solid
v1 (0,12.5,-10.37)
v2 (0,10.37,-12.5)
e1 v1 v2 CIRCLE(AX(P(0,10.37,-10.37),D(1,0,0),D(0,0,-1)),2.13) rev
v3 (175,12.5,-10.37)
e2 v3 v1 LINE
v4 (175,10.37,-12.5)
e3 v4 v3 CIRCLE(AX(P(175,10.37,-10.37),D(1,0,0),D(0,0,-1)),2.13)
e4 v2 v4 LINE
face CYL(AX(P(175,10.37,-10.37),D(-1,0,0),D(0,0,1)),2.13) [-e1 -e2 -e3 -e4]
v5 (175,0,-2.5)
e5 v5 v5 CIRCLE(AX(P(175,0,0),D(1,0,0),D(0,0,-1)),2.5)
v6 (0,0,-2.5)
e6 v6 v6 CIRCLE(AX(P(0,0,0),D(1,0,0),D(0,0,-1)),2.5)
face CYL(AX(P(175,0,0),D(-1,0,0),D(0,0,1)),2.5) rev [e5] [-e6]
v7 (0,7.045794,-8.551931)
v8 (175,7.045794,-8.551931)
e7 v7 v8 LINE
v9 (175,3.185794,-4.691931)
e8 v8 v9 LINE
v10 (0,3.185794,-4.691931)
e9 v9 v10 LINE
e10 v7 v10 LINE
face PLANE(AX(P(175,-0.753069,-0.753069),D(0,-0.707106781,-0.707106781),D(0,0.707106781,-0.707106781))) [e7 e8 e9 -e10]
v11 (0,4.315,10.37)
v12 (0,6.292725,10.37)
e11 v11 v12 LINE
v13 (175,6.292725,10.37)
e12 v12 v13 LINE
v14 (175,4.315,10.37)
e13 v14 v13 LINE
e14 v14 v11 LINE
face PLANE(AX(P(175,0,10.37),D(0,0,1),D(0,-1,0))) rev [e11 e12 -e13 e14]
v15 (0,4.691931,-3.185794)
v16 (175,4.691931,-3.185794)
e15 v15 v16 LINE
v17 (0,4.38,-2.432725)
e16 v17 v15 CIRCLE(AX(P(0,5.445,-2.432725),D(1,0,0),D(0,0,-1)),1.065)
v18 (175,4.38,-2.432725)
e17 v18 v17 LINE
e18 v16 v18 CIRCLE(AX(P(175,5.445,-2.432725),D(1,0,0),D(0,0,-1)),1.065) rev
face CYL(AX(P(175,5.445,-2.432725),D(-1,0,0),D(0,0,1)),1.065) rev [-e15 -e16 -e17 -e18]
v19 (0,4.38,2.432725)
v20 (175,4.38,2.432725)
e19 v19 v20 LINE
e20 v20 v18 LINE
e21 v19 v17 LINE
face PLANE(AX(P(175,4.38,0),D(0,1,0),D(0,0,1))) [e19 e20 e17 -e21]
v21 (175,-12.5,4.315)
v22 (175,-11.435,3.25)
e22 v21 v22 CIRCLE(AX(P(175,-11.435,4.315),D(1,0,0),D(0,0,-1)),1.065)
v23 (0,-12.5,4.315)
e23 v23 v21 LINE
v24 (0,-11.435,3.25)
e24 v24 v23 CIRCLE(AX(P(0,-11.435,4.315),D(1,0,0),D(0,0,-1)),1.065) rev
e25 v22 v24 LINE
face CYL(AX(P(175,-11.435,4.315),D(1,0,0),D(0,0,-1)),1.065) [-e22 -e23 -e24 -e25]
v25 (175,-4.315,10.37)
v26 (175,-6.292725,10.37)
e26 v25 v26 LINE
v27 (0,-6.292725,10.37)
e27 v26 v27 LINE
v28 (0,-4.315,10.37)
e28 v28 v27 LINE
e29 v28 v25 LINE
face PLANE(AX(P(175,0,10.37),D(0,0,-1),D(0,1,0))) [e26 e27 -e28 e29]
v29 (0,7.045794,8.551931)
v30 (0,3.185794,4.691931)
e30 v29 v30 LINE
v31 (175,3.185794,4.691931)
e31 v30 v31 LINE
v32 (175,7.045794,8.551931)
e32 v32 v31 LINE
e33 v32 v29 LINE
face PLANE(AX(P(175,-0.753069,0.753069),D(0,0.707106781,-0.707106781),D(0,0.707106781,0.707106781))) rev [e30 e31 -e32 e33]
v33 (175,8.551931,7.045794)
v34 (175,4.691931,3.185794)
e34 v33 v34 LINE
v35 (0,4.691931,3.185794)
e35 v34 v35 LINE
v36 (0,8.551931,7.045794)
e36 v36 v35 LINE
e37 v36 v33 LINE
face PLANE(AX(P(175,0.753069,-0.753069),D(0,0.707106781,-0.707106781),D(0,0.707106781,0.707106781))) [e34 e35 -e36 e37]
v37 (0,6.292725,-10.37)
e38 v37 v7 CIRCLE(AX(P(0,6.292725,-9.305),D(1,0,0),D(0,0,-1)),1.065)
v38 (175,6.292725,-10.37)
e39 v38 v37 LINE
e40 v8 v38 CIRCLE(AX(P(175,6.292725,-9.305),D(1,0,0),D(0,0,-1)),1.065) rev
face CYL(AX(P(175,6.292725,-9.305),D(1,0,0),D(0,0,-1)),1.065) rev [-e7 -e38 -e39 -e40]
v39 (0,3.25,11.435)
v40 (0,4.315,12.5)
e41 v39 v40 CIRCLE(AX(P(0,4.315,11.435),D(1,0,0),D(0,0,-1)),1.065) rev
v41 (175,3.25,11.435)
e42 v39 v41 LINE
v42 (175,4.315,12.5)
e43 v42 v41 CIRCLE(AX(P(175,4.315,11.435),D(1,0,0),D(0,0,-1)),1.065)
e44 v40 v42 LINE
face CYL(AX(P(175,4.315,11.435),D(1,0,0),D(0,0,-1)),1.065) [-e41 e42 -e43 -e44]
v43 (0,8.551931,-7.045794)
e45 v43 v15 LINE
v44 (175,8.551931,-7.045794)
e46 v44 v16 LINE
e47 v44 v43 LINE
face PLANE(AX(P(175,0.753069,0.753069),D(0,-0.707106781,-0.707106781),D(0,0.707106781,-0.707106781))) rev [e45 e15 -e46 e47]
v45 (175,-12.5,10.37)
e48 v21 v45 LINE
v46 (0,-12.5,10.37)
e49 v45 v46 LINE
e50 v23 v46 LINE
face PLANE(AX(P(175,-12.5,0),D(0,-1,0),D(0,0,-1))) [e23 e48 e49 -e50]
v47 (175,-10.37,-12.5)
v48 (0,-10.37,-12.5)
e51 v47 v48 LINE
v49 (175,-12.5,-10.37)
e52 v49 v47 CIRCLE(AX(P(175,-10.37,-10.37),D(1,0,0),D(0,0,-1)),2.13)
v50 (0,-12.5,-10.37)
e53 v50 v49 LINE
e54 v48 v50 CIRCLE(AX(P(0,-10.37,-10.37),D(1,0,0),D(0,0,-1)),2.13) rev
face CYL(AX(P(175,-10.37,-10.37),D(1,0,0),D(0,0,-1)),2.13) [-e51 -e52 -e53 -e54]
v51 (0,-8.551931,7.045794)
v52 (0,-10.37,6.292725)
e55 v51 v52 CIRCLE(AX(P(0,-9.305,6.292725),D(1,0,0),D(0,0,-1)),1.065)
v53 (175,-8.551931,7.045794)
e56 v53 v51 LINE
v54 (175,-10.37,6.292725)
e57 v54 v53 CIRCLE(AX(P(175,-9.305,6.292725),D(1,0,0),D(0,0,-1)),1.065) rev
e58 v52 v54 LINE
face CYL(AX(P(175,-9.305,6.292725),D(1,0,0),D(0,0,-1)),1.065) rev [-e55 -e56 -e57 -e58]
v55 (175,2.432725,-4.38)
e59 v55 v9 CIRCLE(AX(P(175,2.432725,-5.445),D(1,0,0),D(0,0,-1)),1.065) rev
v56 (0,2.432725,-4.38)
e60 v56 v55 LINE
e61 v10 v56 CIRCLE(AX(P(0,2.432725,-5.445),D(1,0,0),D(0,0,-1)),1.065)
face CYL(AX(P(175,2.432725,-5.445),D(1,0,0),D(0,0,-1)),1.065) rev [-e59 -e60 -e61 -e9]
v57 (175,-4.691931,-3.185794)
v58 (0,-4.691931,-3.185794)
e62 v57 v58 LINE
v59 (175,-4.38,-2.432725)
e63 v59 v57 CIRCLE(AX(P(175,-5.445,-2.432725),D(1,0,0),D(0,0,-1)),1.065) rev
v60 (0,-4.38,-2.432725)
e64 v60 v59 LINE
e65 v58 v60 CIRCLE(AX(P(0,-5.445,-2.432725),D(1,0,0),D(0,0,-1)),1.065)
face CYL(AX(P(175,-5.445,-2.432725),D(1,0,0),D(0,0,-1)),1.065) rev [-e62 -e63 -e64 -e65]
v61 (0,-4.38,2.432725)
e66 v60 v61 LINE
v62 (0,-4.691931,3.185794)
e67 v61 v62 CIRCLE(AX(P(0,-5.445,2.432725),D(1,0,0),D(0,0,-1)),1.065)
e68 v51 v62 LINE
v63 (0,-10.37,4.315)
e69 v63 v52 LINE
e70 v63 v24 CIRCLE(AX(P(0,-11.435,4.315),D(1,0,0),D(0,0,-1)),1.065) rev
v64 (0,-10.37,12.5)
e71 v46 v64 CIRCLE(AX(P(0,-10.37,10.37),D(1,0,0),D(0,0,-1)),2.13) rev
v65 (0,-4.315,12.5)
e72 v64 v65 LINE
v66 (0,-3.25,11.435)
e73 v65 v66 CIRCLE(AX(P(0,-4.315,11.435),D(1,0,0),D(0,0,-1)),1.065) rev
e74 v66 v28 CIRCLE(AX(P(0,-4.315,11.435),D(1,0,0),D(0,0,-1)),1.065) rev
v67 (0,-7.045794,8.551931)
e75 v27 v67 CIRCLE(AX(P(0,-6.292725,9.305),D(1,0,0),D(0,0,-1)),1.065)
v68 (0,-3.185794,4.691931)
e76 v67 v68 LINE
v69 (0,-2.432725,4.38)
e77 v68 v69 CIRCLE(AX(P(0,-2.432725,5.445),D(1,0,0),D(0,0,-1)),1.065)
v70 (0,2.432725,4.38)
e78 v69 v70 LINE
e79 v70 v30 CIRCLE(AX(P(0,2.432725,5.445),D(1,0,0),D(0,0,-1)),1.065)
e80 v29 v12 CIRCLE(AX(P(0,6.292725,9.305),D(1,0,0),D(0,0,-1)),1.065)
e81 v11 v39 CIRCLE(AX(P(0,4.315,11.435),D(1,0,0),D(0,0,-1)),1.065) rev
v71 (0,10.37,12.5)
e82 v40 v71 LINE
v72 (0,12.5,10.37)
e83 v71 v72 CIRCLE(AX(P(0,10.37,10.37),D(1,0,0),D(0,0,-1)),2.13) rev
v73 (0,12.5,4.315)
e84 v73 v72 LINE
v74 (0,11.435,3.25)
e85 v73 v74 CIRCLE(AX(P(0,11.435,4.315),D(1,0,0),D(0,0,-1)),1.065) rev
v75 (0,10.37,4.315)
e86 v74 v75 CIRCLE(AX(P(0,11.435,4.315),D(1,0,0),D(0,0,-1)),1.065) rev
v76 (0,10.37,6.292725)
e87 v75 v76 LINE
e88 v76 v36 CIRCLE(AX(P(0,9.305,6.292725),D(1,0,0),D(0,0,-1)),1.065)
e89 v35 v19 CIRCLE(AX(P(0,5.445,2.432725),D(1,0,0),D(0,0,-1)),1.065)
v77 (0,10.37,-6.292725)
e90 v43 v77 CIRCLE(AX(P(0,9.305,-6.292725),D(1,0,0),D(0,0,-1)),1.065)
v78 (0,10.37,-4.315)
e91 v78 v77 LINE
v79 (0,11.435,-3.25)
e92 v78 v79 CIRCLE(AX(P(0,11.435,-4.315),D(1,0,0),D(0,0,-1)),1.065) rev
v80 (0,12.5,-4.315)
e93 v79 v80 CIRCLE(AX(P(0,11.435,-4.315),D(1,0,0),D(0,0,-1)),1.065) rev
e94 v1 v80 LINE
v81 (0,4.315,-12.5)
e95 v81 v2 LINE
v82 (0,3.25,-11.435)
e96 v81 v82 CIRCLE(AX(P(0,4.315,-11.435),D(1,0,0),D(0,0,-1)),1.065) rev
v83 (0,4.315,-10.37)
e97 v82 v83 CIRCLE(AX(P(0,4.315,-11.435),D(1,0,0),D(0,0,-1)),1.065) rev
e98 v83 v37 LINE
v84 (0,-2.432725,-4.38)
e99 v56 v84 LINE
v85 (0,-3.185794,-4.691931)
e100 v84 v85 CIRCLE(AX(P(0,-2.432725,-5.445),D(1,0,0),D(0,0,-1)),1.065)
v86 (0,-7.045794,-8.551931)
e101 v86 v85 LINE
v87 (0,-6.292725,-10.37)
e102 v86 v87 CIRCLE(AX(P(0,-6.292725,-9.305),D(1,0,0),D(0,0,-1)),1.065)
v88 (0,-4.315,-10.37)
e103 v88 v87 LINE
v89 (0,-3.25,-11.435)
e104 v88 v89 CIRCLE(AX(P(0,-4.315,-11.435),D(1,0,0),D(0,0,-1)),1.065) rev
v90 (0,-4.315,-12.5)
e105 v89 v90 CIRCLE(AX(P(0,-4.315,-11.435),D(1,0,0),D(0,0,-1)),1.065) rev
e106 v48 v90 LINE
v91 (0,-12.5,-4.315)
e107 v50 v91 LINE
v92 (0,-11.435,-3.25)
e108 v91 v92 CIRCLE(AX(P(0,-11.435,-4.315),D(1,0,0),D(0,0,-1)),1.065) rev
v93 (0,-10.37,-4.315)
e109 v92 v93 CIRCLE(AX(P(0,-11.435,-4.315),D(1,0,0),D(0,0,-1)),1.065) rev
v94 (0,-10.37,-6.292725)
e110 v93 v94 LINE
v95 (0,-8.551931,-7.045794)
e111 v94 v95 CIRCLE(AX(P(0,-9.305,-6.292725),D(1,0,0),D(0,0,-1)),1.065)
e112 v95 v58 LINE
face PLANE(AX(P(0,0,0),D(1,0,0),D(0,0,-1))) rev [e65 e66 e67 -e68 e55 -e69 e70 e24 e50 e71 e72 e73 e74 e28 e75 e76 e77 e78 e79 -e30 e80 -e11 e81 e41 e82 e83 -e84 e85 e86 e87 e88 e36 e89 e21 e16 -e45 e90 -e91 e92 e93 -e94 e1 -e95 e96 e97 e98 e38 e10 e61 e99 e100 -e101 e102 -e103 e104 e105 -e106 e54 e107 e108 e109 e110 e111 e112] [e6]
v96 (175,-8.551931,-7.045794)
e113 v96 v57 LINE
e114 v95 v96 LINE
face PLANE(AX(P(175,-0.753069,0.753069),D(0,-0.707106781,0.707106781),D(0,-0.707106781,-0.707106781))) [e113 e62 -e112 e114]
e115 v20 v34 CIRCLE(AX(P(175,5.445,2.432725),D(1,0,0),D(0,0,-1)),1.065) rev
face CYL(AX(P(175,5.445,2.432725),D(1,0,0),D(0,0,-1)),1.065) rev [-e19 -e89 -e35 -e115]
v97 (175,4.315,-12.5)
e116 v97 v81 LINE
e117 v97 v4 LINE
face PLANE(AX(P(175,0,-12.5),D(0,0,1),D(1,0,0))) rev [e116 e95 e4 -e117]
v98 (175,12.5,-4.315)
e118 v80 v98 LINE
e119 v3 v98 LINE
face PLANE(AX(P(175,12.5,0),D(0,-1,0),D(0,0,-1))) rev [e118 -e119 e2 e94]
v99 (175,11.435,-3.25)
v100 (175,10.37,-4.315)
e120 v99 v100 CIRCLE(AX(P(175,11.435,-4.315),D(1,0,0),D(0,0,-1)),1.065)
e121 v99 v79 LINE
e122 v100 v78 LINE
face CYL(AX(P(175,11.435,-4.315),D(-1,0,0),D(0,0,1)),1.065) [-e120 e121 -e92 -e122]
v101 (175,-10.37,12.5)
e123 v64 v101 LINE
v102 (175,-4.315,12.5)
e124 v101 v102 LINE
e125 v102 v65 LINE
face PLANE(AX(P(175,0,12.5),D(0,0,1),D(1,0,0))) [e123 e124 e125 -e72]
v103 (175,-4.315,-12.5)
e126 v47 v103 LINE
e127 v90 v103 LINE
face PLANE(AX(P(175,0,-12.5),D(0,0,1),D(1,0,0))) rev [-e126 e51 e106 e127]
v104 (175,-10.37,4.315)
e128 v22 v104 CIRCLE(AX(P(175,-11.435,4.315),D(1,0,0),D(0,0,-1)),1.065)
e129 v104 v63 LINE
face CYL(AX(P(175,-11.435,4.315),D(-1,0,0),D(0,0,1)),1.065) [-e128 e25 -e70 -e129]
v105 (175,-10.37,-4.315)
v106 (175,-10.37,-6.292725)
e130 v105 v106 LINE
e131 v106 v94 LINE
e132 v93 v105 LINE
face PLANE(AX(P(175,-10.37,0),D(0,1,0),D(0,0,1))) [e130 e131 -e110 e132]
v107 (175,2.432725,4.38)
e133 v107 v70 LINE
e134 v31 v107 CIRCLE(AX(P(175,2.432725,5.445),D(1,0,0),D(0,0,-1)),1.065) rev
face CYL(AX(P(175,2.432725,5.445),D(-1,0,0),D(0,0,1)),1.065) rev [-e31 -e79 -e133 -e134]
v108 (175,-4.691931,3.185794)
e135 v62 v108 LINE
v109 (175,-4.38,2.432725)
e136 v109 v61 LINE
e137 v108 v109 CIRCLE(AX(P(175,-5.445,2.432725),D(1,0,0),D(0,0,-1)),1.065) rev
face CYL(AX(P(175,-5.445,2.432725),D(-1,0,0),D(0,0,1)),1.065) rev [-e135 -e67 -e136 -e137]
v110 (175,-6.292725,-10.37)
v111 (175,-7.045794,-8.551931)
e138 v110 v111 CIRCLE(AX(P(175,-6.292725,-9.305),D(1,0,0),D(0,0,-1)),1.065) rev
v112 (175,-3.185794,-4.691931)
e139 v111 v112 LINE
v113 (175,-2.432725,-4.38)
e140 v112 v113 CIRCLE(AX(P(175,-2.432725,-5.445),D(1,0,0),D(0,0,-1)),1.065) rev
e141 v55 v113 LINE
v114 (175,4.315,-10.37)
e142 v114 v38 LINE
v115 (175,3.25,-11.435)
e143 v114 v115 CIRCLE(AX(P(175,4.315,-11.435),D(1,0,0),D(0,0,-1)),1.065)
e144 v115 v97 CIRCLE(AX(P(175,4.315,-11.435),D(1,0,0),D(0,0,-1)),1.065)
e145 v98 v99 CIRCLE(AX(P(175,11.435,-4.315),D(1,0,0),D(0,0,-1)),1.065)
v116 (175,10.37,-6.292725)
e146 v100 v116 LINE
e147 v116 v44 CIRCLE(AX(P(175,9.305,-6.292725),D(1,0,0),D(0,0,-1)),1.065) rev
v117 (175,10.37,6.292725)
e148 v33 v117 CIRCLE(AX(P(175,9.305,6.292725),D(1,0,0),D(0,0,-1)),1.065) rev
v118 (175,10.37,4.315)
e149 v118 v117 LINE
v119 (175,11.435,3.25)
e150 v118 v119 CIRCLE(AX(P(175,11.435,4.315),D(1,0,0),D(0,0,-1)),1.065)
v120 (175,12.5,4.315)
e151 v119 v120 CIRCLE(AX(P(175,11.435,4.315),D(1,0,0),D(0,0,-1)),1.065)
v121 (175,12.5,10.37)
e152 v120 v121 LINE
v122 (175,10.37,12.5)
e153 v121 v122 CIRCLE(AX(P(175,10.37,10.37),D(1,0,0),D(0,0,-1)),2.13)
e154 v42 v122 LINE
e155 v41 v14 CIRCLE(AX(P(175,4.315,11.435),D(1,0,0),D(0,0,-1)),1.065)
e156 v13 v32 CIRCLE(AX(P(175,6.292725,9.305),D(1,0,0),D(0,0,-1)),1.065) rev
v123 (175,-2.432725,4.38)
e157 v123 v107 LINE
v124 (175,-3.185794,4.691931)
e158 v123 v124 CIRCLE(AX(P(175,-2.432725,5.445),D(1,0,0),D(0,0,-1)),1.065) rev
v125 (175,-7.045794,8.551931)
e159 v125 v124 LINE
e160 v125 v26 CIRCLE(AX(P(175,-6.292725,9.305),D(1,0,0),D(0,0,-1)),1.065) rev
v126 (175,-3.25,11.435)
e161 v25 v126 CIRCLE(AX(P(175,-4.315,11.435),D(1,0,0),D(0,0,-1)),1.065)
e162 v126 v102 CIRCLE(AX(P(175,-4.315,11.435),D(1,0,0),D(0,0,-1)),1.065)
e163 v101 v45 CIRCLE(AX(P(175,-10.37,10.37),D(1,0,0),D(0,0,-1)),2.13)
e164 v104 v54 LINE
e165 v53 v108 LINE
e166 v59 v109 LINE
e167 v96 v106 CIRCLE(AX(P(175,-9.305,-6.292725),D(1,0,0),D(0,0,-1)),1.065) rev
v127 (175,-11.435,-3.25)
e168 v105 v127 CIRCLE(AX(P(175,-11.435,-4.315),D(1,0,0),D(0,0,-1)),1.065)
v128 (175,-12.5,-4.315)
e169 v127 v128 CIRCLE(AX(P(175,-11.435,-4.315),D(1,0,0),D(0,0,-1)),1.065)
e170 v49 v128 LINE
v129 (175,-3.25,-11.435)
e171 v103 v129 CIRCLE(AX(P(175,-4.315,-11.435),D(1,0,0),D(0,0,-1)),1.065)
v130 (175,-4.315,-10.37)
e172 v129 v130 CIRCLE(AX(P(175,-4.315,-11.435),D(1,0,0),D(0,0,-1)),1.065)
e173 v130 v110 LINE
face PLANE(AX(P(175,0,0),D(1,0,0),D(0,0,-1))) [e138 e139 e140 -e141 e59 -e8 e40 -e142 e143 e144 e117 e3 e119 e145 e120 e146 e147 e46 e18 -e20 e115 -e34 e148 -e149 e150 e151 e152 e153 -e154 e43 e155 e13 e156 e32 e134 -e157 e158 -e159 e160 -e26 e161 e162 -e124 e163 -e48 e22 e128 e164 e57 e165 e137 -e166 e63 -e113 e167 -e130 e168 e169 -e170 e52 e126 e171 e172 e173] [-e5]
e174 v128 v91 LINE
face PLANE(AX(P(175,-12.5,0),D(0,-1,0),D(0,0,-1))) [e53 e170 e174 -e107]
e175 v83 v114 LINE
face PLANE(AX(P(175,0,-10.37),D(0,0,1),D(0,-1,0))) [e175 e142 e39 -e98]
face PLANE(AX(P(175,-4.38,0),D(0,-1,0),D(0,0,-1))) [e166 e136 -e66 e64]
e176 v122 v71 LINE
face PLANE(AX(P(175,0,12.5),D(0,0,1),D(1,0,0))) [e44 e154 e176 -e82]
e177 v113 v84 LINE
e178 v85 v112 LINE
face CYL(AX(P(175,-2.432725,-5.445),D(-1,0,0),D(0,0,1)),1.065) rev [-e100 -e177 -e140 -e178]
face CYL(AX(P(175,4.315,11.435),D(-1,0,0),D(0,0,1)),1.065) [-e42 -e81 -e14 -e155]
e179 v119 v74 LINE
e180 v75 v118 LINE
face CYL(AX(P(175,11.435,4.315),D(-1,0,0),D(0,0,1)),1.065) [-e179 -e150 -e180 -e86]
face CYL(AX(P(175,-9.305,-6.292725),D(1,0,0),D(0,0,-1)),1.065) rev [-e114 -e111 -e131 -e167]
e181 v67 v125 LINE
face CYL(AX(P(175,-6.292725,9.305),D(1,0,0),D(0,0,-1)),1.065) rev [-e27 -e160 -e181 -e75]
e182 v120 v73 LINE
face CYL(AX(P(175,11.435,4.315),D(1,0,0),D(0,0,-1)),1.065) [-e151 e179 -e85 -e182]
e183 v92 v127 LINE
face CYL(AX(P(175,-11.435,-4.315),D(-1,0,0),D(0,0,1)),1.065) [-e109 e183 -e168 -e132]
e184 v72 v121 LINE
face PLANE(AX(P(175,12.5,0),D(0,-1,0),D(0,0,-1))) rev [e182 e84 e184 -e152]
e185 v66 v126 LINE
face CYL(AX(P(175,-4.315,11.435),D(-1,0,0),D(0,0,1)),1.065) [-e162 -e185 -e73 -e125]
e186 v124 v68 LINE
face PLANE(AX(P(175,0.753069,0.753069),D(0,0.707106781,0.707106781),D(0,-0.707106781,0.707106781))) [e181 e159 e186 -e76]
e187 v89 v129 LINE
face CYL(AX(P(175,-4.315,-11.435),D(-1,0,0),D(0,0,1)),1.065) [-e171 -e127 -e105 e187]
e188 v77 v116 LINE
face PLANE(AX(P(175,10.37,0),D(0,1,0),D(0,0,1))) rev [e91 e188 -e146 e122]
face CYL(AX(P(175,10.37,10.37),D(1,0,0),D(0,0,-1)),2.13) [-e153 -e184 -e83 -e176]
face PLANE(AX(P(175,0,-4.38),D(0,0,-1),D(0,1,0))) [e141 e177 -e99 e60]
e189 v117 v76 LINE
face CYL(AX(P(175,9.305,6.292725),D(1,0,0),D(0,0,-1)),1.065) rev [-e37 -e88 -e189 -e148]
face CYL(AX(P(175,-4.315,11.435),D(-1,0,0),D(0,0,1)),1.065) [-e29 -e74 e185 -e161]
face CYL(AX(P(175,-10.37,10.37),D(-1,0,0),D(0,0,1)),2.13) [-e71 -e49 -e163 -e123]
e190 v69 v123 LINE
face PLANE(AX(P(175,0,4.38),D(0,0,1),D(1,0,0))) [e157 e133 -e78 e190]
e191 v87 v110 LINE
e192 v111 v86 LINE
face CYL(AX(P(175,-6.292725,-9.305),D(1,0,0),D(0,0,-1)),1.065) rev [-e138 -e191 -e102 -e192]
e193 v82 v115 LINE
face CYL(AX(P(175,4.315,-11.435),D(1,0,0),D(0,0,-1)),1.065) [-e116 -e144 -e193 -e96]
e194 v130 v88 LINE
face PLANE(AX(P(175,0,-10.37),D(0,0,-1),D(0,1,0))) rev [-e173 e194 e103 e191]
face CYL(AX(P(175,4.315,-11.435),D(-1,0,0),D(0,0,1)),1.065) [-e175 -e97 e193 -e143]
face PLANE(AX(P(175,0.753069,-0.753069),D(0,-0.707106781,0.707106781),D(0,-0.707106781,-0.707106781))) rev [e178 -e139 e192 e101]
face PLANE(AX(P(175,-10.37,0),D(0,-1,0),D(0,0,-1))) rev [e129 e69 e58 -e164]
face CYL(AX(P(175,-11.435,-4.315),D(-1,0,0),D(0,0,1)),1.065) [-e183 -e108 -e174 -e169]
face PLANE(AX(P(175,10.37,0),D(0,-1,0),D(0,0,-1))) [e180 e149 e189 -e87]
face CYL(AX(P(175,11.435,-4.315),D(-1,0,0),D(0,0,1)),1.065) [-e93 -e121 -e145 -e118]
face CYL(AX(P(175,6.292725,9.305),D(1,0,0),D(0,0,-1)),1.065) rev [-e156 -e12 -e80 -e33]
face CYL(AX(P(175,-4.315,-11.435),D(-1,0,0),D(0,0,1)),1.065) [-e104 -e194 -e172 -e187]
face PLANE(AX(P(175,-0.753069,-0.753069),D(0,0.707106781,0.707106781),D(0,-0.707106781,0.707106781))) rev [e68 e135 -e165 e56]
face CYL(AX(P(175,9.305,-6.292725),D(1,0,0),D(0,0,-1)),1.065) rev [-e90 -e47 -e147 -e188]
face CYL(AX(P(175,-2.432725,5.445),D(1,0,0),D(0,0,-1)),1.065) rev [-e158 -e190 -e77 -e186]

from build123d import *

# Parameters (mm, degrees)
SKETCH1_R           = 2.5
BOSS_EXTRUDE1_DEPTH = 175
FILLET1_R           = 1.065
FILLET2_R           = 2.13


with BuildPart() as part:
    # Sketch1 → Boss-Extrude1 (new body)
    with BuildSketch(Plane.YZ):
        Polygon((-12.5, -3.25), (-12.5, -12.5), (-3.25, -12.5), (-3.25, -10.37), (-8.863862556, -10.37), (-2.873862556, -4.38), (2.873862556, -4.38), (8.863862556, -10.37), (3.25, -10.37), (3.25, -12.5), (12.5, -12.5), (12.5, -3.25), (10.37, -3.25), (10.37, -8.863862556), (4.38, -2.873862556), (4.38, 2.873862556), (10.37, 8.863862556), (10.37, 3.25), (12.5, 3.25), (12.5, 12.5), (3.25, 12.5), (3.25, 10.37), (8.863862556, 10.37), (2.873862556, 4.38), (-2.873862556, 4.38), (-8.863862556, 10.37), (-3.25, 10.37), (-3.25, 12.5), (-12.5, 12.5), (-12.5, 3.25), (-10.37, 3.25), (-10.37, 8.863862556), (-4.38, 2.873862556), (-4.38, -2.873862556), (-10.37, -8.863862556), (-10.37, -3.25), align=None)
        with Locations(Location((0, 0, 0), (0, 0, 270))):
            Circle(SKETCH1_R, mode=Mode.SUBTRACT)
    extrude(amount=BOSS_EXTRUDE1_DEPTH)

    # Fillet1
    fillet1_edges = [part.edges().sort_by_distance(p)[0] for p in [
        (87.5, -10.37, -8.863862556),
        (87.5, 2.873862556, -4.38),
        (87.5, -2.873862556, -4.38),
        (87.5, -4.38, 2.873862556),
        (87.5, -4.38, -2.873862556),
        (87.5, -2.873862556, 4.38),
        (87.5, 2.873862556, 4.38),
        (87.5, 4.38, 2.873862556),
        (87.5, 4.38, -2.873862556),
        (87.5, -8.863862556, -10.37),
        (87.5, 8.863862556, -10.37),
        (87.5, 10.37, -8.863862556),
        (87.5, -10.37, 8.863862556),
        (87.5, -8.863862556, 10.37),
        (87.5, 10.37, 8.863862556),
        (87.5, 8.863862556, 10.37),
        (87.5, 12.5, 3.25),
        (87.5, -3.25, -12.5),
        (87.5, -10.37, 3.25),
        (87.5, 10.37, 3.25),
        (87.5, -10.37, -3.25),
        (87.5, -12.5, -3.25),
        (87.5, -12.5, 3.25),
        (87.5, 3.25, -10.37),
        (87.5, -3.25, -10.37),
        (87.5, 3.25, -12.5),
        (87.5, 10.37, -3.25),
        (87.5, 12.5, -3.25),
        (87.5, 3.25, 12.5),
        (87.5, 3.25, 10.37),
        (87.5, -3.25, 10.37),
        (87.5, -3.25, 12.5),
    ]]
    fillet(fillet1_edges, radius=FILLET1_R - 0.0001)  # a hair under: the kernel refuses the full size

    # Fillet2
    fillet2_edges = [part.edges().sort_by_distance(p)[0] for p in [
        (87.5, -12.5, 12.5),
        (87.5, 12.5, 12.5),
        (87.5, 12.5, -12.5),
        (87.5, -12.5, -12.5),
    ]]
    fillet(fillet2_edges, radius=FILLET2_R)


solid = part.part
